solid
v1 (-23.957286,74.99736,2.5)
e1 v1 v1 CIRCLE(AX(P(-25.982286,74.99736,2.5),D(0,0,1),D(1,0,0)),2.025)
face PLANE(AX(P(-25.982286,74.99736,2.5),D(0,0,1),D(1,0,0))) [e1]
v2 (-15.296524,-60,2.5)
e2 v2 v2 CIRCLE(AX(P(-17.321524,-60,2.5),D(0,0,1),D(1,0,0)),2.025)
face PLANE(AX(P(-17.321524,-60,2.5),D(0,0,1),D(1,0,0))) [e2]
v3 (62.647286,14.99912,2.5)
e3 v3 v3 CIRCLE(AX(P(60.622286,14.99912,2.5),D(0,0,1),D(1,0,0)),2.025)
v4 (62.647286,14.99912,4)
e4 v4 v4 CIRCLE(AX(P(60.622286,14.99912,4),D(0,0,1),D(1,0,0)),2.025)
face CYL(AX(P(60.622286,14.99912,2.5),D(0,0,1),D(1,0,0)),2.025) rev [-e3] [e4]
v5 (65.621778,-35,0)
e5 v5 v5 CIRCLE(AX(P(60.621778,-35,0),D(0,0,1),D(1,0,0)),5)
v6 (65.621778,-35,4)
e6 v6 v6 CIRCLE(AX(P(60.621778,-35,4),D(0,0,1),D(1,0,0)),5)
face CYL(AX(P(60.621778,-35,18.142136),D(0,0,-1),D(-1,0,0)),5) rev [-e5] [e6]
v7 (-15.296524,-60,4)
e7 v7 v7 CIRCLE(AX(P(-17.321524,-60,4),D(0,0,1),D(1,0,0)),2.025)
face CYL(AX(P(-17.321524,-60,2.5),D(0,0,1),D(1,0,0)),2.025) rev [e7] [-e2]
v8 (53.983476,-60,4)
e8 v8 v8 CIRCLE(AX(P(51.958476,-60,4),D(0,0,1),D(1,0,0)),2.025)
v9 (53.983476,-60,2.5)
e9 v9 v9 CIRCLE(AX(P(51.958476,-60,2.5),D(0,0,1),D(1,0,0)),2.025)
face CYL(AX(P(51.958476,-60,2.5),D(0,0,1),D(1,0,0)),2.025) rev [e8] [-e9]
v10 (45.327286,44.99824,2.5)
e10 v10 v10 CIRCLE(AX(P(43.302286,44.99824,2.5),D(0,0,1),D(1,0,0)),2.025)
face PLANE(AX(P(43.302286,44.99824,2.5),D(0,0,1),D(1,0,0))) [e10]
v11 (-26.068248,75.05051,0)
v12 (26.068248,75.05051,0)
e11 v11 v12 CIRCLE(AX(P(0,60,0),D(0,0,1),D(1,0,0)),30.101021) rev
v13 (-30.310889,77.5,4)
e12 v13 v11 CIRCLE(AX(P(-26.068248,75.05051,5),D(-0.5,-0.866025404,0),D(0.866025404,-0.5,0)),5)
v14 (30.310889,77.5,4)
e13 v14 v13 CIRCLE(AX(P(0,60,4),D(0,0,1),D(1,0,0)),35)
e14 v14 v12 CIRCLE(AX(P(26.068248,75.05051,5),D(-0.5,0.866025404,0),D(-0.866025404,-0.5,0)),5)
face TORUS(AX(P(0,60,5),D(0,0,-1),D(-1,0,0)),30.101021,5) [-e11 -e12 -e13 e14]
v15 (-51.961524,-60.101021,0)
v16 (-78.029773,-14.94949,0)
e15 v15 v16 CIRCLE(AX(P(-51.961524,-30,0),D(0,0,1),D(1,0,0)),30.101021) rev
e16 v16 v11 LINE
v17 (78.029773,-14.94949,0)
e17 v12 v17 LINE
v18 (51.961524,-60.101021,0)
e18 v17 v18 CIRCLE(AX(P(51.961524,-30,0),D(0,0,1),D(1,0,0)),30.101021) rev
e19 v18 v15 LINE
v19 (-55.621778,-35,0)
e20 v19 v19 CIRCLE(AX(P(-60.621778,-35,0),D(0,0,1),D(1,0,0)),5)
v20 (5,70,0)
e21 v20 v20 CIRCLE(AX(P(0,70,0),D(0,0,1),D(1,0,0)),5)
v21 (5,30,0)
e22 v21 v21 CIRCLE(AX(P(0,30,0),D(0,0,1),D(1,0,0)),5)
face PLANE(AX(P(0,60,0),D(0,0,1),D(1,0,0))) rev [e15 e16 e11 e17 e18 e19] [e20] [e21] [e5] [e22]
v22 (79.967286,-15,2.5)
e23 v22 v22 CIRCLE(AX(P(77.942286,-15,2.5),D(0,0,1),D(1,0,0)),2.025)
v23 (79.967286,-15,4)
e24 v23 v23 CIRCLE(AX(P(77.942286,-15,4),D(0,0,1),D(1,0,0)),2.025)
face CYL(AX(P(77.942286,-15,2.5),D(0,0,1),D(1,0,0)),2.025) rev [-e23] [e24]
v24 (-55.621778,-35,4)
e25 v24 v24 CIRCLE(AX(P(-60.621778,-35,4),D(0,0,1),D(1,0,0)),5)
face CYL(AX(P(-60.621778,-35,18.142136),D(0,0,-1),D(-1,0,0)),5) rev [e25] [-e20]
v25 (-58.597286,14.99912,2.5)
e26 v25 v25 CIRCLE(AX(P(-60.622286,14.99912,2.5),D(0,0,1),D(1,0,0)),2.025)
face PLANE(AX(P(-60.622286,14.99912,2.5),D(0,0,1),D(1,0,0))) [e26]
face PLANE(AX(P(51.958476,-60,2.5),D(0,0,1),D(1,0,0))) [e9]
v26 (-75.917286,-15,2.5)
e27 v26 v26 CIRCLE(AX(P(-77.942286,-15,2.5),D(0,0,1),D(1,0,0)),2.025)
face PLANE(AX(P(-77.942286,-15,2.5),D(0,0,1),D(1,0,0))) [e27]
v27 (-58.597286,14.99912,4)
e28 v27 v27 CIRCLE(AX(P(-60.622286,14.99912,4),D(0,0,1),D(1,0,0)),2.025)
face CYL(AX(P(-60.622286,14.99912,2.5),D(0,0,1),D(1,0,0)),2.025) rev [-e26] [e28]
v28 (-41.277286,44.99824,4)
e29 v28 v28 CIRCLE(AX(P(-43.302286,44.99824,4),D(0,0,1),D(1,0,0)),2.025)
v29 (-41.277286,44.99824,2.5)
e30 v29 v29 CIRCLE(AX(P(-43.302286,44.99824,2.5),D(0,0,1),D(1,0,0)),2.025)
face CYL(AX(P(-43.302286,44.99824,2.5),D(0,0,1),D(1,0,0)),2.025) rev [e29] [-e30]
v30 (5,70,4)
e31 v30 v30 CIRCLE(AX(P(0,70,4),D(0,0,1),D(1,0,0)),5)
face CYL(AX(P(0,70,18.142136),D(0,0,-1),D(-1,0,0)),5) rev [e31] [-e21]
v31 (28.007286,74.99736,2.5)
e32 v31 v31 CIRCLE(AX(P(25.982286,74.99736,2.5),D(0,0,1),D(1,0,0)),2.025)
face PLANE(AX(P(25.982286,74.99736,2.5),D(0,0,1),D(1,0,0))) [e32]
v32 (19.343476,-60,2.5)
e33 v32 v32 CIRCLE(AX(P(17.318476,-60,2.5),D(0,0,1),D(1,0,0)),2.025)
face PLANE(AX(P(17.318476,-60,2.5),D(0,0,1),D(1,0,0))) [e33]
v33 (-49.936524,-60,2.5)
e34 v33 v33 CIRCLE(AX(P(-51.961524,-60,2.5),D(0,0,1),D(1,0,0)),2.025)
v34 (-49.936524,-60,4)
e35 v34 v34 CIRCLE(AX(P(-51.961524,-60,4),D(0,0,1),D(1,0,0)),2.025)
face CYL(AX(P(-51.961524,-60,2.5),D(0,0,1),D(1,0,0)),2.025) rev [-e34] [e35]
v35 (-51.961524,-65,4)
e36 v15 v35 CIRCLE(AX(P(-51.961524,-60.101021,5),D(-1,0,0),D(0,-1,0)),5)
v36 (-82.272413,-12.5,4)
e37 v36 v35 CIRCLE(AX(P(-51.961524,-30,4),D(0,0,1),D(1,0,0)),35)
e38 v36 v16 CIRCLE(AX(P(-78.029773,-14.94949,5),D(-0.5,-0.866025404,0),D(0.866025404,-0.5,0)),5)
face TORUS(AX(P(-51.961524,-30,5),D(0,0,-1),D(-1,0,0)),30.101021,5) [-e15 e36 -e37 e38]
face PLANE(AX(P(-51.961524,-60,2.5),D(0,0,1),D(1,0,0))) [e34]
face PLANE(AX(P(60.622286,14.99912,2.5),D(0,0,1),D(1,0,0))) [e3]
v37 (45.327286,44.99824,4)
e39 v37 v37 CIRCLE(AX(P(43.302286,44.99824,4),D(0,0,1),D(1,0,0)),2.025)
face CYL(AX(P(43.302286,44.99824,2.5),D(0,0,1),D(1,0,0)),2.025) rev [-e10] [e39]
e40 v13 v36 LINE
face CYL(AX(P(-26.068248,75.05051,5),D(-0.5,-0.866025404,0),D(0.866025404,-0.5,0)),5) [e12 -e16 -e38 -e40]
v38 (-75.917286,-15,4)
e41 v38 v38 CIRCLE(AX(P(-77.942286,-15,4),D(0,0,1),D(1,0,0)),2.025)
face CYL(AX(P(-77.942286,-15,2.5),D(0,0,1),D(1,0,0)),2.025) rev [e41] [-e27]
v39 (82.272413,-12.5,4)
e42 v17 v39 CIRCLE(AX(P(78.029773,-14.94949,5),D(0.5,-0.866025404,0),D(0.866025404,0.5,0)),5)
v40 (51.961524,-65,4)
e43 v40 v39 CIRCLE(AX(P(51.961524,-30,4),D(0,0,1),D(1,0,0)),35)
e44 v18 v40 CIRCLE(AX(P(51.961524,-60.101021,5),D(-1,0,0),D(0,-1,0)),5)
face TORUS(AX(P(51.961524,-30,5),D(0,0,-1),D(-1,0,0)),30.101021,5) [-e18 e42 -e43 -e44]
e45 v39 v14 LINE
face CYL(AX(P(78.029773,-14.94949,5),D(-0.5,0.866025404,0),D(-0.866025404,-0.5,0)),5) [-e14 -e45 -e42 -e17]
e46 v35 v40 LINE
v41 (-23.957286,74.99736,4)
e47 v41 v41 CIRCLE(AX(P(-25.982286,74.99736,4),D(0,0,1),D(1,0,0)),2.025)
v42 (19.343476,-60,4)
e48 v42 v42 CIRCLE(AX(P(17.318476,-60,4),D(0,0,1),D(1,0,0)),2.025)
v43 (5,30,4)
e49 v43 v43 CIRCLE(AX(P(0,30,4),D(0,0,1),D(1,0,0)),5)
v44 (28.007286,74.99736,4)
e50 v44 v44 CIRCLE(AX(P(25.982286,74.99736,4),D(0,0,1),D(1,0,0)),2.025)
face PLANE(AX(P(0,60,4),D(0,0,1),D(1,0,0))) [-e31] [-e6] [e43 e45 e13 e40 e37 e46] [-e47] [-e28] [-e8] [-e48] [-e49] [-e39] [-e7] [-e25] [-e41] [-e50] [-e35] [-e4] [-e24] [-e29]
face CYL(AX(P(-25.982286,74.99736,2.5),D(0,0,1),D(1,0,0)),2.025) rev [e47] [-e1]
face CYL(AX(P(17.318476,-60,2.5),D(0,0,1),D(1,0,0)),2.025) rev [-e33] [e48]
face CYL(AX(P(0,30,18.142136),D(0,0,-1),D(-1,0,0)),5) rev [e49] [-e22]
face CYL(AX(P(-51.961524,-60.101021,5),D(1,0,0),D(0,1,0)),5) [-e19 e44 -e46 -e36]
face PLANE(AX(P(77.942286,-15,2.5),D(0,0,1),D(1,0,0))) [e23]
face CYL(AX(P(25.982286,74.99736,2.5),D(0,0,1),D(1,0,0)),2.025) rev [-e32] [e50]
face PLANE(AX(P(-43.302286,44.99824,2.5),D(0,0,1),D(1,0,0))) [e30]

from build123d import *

# Parameters (mm, degrees)
RESSALTO_EXTRUS_O1_DEPTH = 4
ESBO_O2_R                = 5
CORTE_EXTRUS_O1_DEPTH    = 4
ESBO_O3_R                = 2.025
CORTE_EXTRUS_O2_DEPTH    = 1.5
FILETE1_R                = 5


with BuildPart() as part:
    # Esboço1 → Ressalto-extrusão1 (new body)
    with BuildSketch(Plane.XY):
        with BuildLine():
            Line((-30.310889132, 77.5), (-82.27241336, -12.5))
            ThreePointArc((-82.27241336, -12.5), (-82.27241336, -47.5), (-51.961524227, -65))
            Line((-51.961524227, -65), (51.961524227, -65))
            ThreePointArc((51.961524227, -65), (82.27241336, -47.5), (82.27241336, -12.5))
            Line((82.27241336, -12.5), (30.310889132, 77.5))
            ThreePointArc((30.310889132, 77.5), (0, 95), (-30.310889132, 77.5))
        make_face()
    extrude(amount=RESSALTO_EXTRUS_O1_DEPTH)

    # Esboço2 → Corte-extrusão1 (cut)
    with BuildSketch(Plane.XY):
        with Locations((0, 70)):
            Circle(ESBO_O2_R)
        with Locations((60.621778265, -35)):
            Circle(ESBO_O2_R)
        with Locations((-60.621778265, -35)):
            Circle(ESBO_O2_R)
        with Locations((0, 30)):
            Circle(ESBO_O2_R)
    extrude(amount=CORTE_EXTRUS_O1_DEPTH, mode=Mode.SUBTRACT)

    # Esboço3 → Corte-extrusão2 (cut)
    with BuildSketch(Plane.XY.offset(4)):
        with Locations((-77.942286341, -15)):
            Circle(ESBO_O3_R)
        with Locations((-51.961524227, -60)):
            Circle(ESBO_O3_R)
        with Locations((77.942286341, -15)):
            Circle(ESBO_O3_R)
        with Locations((-60.622286341, 14.999119987)):
            Circle(ESBO_O3_R)
        with Locations((-43.302286341, 44.998239974)):
            Circle(ESBO_O3_R)
        with Locations((-25.982286341, 74.997359961)):
            Circle(ESBO_O3_R)
        with Locations((60.622286341, 14.999119987)):
            Circle(ESBO_O3_R)
        with Locations((43.302286341, 44.998239974)):
            Circle(ESBO_O3_R)
        with Locations((25.982286341, 74.997359961)):
            Circle(ESBO_O3_R)
        with Locations((-17.321524227, -60)):
            Circle(ESBO_O3_R)
        with Locations((17.318475773, -60)):
            Circle(ESBO_O3_R)
        with Locations((51.958475773, -60)):
            Circle(ESBO_O3_R)
    extrude(amount=-CORTE_EXTRUS_O2_DEPTH, mode=Mode.SUBTRACT)

    # Filete1
    # the kernel refuses this fillet: 5 mm, written as the material it takes off along each edge
    with BuildSketch(Plane(origin=(-51.961524227, -30, 0), x_dir=(-0.8660254037844398, 0.49999999999999795, 0), z_dir=(0.49999999999999795, 0.8660254037844398, 0))) as filete1_piece_1:
        with BuildLine():
            CenterArc((30.101020514, 5), FILETE1_R, 270, 78.463040967)
            Line((35, 4), (35.09797959, 3.98))
            ThreePointArc((35.09797959, 3.98), (35.1, 2), (35.1, 0))
            Line((35.1, 0), (35, -0.1))
            Line((35, -0.1), (30.101020514, -0.1))
            Line((30.101020514, -0.1), (30.101020514, 0))
        make_face()
    revolve(axis=Axis((-51.961524227, -30, 0), (0, 0, 1)), revolution_arc=120, mode=Mode.SUBTRACT)
    with BuildSketch(Plane(origin=(-30.310889132, 77.5, 0), x_dir=(0.8660254037844398, -0.4999999999999981, 0), z_dir=(-0.4999999999999981, -0.8660254037844398, 0)), Plane(origin=(-51.961524227, -65, 0), x_dir=(0, 1, 0), z_dir=(1, 0, 0))) as filete1_piece_2:
        with BuildLine():
            CenterArc((4.898979486, 5), FILETE1_R, 191.536959033, 78.463040967)
            Line((0, 4), (-0.09797959, 3.98))
            ThreePointArc((-0.09797959, 3.98), (-0.1, 2), (-0.1, 0))
            Line((-0.1, 0), (0, -0.1))
            Line((0, -0.1), (4.898979486, -0.1))
            Line((4.898979486, -0.1), (4.898979486, 0))
        make_face()
    extrude(amount=103.923048454, mode=Mode.SUBTRACT)
    with BuildSketch(Plane(origin=(0, 60, 0), x_dir=(0.8660254037844363, 0.5000000000000041, 0), z_dir=(0.5000000000000041, -0.8660254037844363, 0))) as filete1_piece_3:
        with BuildLine():
            CenterArc((30.101020514, 5), FILETE1_R, 270, 78.463040967)
            Line((30.101020514, 0), (30.101020514, -0.1))
            Line((30.101020514, -0.1), (35, -0.1))
            Line((35, -0.1), (35.1, 0))
            ThreePointArc((35.1, 0), (35.1, 2), (35.09797959, 3.98))
            Line((35.09797959, 3.98), (35, 4))
        make_face()
    revolve(axis=Axis((0, 60, 0), (0, 0, 1)), revolution_arc=120, mode=Mode.SUBTRACT)
    with BuildSketch(Plane(origin=(82.27241336, -12.5, 0), x_dir=(-1.3637382312526318e-12, -7.873546349178999e-13, 1.0), z_dir=(-0.5000000000000043, 0.8660254037844363, 0))) as filete1_piece_4:
        with BuildLine():
            CenterArc((5, -4.898979486), FILETE1_R, 101.536959033, 78.463040967)
            Line((0, -4.898979486), (-0.1, -4.898979486))
            Line((-0.1, -4.898979486), (-0.1, 0))
            Line((-0.1, 0), (0, 0.1))
            ThreePointArc((0, 0.1), (2, 0.1), (3.98, 0.09797959))
            Line((3.98, 0.09797959), (4, 0))
        make_face()
    extrude(amount=103.923048454, mode=Mode.SUBTRACT)
    with BuildSketch(Plane(origin=(51.961524227, -30, 0), x_dir=(0, -1, 0), z_dir=(-1, 0, 0))) as filete1_piece_5:
        with BuildLine():
            CenterArc((30.101020514, 5), FILETE1_R, 270, 78.463040967)
            Line((30.101020514, 0), (30.101020514, -0.1))
            Line((30.101020514, -0.1), (35, -0.1))
            Line((35, -0.1), (35.1, 0))
            ThreePointArc((35.1, 0), (35.1, 2), (35.09797959, 3.98))
            Line((35.09797959, 3.98), (35, 4))
        make_face()
    revolve(axis=Axis((51.961524227, -30, 0), (0, 0, 1)), revolution_arc=120, mode=Mode.SUBTRACT)


solid = part.part
